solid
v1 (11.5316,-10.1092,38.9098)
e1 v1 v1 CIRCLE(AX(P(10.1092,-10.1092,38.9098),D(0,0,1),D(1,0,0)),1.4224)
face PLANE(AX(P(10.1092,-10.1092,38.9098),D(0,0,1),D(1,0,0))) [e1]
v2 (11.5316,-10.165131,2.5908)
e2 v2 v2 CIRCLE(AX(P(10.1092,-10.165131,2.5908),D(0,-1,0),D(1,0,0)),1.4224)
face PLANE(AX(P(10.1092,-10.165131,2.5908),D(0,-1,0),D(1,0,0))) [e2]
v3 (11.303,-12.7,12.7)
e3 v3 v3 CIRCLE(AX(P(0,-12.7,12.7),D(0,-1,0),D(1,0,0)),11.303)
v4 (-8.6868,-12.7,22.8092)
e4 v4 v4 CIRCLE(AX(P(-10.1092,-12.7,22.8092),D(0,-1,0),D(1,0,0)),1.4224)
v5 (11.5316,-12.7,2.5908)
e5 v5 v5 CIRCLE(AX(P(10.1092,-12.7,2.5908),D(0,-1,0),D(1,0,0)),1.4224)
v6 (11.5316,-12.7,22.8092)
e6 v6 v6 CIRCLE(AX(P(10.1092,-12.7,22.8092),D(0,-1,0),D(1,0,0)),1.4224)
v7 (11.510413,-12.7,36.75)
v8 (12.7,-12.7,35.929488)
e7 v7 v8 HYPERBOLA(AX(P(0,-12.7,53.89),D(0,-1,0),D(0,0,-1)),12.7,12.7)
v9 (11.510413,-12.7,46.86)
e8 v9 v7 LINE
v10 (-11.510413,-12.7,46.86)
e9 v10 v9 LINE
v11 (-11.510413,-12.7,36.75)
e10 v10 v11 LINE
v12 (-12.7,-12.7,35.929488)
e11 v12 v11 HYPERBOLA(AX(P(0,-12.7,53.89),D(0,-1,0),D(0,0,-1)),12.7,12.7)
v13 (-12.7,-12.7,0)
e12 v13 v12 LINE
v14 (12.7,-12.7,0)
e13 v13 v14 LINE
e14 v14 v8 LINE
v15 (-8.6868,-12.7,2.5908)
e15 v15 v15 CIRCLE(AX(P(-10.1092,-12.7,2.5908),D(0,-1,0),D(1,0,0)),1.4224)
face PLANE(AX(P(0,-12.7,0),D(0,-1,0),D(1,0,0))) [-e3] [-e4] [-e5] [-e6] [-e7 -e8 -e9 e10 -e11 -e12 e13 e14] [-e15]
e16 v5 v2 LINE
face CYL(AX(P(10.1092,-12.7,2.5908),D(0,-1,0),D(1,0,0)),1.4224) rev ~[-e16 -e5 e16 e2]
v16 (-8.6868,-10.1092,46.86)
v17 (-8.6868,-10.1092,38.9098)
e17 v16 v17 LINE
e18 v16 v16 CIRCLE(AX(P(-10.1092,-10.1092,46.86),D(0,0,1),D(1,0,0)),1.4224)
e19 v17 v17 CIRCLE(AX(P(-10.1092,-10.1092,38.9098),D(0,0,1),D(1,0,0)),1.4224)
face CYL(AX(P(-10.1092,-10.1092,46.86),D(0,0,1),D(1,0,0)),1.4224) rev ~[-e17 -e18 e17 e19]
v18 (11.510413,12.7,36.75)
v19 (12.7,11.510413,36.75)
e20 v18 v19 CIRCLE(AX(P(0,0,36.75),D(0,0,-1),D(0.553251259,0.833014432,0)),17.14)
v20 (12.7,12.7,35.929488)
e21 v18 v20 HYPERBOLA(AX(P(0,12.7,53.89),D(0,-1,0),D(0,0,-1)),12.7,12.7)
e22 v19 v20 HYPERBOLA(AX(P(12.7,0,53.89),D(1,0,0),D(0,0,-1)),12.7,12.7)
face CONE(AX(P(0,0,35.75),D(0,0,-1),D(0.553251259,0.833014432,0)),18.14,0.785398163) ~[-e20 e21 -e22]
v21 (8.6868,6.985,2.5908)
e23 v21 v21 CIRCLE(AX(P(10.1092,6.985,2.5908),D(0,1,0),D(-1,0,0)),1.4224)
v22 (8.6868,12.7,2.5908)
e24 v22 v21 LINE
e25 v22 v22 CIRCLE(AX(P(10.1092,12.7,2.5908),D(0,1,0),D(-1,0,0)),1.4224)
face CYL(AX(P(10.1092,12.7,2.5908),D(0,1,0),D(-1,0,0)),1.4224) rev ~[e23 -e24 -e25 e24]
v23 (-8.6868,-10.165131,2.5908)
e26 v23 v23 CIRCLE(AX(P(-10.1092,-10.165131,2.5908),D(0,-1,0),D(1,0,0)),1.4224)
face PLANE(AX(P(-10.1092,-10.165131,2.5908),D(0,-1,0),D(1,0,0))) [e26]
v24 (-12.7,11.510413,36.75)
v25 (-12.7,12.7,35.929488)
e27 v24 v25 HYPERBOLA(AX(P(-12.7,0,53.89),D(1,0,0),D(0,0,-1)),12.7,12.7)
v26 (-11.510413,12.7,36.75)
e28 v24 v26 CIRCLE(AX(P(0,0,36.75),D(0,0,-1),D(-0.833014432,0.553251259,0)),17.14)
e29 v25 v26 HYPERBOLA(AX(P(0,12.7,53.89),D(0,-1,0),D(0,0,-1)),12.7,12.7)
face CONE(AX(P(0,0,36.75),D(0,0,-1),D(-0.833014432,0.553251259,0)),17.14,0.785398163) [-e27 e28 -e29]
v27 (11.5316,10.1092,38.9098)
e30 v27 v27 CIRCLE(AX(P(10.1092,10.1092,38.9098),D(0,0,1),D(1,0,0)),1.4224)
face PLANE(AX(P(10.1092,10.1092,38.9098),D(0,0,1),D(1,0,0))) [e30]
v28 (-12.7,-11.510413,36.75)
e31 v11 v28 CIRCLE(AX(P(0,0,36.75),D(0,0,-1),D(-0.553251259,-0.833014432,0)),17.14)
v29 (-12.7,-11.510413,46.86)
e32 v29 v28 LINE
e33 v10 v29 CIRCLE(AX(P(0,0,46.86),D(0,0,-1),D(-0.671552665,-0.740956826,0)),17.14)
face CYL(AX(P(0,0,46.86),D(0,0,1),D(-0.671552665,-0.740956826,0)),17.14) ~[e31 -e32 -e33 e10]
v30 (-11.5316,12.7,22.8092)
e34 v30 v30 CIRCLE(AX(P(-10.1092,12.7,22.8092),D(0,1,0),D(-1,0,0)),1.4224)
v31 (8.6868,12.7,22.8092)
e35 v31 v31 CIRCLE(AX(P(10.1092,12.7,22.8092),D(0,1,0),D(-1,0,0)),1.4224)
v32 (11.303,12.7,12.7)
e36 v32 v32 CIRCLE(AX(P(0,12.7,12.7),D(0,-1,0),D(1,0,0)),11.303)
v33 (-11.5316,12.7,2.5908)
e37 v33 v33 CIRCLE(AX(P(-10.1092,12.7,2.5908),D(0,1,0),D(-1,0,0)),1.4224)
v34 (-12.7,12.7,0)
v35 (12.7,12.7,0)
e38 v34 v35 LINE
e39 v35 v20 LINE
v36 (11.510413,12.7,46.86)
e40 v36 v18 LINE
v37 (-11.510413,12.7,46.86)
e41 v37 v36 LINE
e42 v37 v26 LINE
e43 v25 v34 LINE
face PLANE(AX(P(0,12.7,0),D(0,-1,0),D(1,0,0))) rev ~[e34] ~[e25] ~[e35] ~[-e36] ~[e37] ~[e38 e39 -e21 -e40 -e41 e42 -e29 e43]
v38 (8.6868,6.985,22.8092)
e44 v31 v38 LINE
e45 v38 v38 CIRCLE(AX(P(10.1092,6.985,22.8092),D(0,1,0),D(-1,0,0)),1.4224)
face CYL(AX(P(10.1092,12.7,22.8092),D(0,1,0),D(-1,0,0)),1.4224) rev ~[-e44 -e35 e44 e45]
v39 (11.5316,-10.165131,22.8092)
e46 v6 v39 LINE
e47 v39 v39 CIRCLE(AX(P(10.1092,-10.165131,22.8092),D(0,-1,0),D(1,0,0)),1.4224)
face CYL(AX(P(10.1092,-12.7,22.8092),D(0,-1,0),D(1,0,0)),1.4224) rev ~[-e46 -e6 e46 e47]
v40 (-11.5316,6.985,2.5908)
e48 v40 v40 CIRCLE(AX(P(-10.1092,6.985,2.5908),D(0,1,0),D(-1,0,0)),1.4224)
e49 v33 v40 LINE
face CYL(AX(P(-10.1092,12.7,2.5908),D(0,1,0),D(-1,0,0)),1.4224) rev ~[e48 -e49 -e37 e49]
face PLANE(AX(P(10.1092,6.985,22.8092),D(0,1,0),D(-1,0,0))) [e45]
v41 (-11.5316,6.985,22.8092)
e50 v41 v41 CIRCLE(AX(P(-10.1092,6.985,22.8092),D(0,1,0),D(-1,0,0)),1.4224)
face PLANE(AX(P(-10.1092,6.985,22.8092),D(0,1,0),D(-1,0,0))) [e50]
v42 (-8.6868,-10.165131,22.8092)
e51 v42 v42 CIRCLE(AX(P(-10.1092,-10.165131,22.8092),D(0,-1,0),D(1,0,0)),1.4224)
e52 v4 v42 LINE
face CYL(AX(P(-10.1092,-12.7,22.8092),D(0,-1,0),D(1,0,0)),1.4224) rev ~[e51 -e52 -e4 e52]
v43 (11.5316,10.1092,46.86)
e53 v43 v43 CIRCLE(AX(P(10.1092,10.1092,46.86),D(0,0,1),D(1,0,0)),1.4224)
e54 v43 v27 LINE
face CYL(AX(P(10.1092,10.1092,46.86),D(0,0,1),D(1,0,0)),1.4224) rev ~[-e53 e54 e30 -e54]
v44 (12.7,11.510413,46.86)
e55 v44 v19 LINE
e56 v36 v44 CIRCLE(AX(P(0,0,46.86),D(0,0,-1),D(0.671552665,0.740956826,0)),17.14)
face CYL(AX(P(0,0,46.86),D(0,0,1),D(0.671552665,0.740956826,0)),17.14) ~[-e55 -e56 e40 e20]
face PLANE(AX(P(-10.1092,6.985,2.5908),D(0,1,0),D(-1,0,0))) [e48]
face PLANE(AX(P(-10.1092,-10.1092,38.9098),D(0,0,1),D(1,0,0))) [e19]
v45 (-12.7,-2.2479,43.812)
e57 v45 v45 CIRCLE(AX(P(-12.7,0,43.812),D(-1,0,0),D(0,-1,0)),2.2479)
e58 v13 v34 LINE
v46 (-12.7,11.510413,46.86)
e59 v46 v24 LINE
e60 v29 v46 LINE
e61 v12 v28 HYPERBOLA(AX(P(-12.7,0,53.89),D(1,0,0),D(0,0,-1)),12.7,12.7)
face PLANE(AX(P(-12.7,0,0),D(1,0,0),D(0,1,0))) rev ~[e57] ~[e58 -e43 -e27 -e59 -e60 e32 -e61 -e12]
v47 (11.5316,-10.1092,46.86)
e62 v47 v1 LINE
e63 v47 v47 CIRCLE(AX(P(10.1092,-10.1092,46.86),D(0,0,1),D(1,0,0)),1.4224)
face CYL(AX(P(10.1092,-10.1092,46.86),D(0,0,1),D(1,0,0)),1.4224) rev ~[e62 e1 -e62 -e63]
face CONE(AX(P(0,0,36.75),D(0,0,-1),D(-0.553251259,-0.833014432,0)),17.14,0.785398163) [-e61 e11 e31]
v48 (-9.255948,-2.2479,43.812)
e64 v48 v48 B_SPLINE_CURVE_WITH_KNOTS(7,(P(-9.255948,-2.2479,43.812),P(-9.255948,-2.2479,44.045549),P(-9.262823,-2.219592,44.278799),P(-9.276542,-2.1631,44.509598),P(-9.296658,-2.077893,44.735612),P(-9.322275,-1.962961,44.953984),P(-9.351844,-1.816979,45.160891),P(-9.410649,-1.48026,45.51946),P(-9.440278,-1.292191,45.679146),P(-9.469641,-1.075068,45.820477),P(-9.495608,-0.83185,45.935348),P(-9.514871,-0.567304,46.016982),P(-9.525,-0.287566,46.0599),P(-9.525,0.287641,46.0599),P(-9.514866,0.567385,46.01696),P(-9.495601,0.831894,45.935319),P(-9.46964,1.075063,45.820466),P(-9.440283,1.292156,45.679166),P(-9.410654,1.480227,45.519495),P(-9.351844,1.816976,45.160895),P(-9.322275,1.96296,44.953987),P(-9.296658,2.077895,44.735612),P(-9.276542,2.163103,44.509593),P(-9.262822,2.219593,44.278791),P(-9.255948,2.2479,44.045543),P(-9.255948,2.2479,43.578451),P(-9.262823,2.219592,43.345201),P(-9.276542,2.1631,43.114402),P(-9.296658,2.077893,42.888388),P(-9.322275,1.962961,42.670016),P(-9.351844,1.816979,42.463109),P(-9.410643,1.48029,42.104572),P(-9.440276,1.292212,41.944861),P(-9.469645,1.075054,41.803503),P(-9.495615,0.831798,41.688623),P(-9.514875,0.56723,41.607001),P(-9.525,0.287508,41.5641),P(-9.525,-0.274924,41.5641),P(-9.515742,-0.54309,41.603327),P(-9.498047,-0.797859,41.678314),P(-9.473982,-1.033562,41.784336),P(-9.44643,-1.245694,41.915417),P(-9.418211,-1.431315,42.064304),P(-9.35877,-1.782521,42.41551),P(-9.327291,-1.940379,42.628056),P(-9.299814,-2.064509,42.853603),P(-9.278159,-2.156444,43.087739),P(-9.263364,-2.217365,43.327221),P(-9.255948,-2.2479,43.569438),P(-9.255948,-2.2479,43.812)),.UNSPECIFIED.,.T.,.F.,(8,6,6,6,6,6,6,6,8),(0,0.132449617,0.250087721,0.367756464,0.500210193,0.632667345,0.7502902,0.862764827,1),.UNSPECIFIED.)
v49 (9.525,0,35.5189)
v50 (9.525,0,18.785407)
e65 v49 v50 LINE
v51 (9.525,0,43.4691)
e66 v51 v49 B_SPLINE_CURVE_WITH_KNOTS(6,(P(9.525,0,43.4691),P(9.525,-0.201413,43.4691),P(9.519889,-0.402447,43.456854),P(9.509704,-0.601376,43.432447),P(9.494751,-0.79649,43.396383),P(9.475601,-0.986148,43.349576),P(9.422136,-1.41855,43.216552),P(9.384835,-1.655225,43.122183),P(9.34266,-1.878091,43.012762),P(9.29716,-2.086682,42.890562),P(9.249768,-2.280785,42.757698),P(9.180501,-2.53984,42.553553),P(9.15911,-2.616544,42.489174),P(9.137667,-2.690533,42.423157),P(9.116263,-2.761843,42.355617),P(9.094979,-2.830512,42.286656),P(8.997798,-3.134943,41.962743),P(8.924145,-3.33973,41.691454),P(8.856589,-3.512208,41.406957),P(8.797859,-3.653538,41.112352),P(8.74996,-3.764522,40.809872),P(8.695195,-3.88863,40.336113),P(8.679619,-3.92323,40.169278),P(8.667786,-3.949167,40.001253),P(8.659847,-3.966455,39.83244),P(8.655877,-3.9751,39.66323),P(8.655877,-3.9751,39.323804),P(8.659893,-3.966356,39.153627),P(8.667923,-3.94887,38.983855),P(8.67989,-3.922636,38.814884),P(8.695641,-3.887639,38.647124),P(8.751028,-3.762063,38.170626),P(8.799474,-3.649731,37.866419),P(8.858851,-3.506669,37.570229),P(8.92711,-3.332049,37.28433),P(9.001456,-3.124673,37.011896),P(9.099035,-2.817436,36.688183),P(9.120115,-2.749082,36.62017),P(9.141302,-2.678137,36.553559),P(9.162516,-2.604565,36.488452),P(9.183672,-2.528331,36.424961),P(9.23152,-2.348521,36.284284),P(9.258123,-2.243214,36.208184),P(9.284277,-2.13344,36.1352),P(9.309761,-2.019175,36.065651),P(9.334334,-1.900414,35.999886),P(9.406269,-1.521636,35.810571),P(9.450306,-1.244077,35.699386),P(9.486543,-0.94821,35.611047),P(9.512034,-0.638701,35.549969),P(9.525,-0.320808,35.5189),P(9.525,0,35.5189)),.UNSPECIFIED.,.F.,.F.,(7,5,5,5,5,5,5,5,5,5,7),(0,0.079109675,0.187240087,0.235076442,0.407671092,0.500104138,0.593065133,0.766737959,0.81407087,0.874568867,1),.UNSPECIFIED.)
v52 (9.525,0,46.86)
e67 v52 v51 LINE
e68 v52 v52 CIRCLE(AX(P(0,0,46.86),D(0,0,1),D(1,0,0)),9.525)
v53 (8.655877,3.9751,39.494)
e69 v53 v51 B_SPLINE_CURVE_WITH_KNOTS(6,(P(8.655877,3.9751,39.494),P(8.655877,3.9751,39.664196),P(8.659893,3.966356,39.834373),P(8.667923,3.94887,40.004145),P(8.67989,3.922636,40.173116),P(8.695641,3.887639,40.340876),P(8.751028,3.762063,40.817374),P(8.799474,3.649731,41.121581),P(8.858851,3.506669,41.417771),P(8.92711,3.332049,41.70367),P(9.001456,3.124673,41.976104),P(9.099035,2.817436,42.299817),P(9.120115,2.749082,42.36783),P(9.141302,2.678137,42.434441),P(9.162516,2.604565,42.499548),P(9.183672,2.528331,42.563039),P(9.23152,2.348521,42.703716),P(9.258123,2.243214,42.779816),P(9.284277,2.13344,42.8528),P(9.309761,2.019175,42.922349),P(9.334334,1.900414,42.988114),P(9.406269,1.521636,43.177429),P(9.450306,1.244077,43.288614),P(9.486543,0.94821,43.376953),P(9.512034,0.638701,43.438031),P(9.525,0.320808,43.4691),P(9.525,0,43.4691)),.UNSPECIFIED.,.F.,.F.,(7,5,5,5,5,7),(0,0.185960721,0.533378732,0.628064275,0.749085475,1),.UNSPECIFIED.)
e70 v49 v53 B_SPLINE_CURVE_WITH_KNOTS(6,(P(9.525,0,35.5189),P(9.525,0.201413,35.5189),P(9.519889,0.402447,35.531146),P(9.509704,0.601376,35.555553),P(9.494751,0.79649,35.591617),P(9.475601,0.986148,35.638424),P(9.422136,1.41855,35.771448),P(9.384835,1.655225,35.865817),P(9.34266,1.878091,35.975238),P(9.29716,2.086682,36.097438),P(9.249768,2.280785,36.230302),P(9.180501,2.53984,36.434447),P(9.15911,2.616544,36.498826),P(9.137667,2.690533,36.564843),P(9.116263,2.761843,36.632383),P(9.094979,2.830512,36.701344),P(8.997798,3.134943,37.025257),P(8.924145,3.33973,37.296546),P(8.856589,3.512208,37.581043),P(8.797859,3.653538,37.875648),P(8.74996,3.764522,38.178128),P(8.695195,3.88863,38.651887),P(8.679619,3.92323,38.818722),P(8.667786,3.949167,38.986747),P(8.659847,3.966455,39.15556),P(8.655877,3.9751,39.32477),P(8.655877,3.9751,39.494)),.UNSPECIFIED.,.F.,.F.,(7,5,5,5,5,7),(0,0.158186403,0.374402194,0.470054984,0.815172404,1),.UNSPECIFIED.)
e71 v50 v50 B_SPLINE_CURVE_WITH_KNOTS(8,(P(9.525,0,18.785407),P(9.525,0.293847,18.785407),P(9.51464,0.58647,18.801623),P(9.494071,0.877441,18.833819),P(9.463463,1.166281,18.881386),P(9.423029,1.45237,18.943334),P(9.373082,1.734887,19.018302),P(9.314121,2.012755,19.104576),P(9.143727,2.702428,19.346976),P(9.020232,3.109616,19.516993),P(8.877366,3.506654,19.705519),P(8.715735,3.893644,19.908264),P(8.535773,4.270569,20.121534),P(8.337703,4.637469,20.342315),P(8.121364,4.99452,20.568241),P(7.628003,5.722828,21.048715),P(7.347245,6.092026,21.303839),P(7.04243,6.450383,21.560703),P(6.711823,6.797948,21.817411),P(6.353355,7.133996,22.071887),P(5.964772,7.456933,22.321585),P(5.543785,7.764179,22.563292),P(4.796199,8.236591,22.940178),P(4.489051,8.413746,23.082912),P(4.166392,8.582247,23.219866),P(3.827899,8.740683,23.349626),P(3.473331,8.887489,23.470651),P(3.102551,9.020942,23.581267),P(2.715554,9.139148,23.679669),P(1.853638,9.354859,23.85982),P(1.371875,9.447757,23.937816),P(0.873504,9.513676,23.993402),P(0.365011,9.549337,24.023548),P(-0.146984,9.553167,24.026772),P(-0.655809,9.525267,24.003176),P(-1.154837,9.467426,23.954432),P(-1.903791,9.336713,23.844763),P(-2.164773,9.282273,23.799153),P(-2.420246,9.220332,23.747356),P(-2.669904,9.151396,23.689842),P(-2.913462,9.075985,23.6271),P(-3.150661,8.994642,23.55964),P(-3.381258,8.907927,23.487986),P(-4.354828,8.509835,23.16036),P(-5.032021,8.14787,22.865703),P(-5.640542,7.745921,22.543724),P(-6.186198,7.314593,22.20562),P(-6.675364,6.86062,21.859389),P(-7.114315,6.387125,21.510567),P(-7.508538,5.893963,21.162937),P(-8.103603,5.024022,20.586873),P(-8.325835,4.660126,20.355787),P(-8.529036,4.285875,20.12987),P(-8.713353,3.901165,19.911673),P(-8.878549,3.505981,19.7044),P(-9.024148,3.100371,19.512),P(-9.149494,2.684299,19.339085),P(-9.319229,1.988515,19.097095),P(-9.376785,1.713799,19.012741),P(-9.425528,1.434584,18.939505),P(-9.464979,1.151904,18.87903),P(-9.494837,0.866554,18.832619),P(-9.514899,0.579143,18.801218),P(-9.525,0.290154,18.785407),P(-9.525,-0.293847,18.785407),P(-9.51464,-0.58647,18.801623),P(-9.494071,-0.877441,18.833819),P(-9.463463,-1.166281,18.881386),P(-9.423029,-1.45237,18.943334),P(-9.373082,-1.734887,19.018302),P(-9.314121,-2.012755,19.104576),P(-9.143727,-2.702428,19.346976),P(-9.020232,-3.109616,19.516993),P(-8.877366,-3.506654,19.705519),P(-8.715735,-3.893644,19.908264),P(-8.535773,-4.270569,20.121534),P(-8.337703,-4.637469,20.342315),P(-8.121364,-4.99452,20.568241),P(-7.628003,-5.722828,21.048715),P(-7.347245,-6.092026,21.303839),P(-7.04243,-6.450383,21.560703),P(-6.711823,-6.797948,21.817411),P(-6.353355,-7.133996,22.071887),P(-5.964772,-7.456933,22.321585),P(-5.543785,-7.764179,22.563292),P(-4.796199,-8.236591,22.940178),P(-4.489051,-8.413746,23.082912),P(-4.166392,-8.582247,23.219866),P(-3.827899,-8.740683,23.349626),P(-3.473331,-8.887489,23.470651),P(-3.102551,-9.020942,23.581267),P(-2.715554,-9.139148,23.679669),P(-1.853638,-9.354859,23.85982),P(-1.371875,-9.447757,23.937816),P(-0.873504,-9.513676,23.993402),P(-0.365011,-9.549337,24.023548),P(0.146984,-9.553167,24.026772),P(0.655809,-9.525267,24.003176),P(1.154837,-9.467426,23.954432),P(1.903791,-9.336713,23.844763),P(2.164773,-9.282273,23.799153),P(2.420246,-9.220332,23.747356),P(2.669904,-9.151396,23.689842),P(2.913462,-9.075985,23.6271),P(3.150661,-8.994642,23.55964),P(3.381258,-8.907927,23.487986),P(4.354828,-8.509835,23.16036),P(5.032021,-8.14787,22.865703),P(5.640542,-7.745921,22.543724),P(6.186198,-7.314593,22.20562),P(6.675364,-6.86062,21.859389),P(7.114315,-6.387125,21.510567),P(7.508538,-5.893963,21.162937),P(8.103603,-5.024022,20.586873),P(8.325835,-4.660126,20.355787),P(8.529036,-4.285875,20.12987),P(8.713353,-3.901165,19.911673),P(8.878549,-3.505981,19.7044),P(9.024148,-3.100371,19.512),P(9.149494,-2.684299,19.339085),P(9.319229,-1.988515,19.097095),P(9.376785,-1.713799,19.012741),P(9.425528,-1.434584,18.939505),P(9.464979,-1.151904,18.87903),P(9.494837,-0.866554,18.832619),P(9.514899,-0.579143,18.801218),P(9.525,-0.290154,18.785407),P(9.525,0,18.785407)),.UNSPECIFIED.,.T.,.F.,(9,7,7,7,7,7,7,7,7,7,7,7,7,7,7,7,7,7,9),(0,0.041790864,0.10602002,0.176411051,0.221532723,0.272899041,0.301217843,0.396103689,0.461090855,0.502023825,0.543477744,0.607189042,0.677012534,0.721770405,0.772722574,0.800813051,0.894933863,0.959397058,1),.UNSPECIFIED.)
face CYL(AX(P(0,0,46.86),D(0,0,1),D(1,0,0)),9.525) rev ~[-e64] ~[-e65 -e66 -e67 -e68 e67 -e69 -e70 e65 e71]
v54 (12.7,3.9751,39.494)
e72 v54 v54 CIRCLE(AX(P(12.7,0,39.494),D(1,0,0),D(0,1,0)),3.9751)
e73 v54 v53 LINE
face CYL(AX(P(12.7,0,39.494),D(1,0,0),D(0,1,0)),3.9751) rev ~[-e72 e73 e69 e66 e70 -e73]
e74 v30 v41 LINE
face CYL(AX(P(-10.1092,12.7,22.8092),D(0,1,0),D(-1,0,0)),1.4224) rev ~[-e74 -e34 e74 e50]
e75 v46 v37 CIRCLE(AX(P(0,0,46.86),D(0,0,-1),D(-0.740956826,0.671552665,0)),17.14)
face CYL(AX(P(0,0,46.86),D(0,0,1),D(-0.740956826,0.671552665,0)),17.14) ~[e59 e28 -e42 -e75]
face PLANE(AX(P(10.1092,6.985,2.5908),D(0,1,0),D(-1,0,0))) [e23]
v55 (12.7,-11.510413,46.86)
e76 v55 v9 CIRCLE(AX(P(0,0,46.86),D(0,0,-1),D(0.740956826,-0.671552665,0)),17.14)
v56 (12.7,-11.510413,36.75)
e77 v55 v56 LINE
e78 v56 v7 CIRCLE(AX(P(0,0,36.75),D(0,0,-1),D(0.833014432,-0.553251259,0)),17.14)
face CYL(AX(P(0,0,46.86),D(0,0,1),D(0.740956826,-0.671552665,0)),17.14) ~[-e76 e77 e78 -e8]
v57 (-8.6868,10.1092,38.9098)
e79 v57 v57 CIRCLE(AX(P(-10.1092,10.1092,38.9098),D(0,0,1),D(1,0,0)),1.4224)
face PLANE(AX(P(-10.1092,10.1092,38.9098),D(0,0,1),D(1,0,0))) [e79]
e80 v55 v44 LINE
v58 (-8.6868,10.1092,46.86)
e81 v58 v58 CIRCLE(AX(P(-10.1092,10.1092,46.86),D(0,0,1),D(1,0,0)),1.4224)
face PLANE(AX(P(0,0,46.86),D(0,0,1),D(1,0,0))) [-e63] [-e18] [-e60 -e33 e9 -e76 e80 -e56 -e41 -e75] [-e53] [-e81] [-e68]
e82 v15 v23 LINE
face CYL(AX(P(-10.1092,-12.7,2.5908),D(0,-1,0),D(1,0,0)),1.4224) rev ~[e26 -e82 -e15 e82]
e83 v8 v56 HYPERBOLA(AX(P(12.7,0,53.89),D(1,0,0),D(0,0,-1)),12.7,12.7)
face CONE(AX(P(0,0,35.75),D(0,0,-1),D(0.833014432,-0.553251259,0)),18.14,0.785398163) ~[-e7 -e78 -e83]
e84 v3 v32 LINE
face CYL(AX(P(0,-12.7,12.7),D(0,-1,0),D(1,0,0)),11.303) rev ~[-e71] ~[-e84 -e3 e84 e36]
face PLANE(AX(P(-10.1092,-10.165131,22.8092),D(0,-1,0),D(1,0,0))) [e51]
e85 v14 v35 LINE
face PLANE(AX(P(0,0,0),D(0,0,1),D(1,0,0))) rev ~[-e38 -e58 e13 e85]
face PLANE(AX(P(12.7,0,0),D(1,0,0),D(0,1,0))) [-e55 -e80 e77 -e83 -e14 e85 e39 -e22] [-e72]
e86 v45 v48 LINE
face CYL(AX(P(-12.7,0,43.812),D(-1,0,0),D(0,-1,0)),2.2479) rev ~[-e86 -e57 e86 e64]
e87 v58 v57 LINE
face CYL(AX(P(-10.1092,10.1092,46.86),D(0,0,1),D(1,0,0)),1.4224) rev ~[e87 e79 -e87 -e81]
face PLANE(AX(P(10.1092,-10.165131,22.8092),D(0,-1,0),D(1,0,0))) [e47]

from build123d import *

# Parameters (mm, degrees)
F0_W         = 25.4
F0_H         = 25.4
F1_DEPTH     = 46.86
F3_DEPTH     = 11.11
F4_T4_ANGLE  = 22.8192997927
F4_T10_ANGLE = 22.8192997927
F4_T16_ANGLE = 22.8192997927
F4_T22_ANGLE = 22.8192997927
F5_R         = 2.2479
F6_DEPTH     = 6.4371526241
F8_R         = 9.525
F9_DEPTH     = 31.75
F10_R        = 1.4224
F11_DEPTH    = 7.9502
F7_R         = 11.303
F12_DEPTH    = 25.401
F7_R_2       = 1.4224
F13_DEPTH    = 2.5348692
F14_R        = 3.9751
F15_DEPTH    = 6.35
F16_R        = 1.4224
F17_DEPTH    = 5.715


# Not quite as in the source:
# - a fillet or chamfer that OpenCascade refuses, or shapes differently, is made with other operations: its cross-section is extruded or revolved along the edge and cut away or added


with BuildPart() as f1:
    # F0 (on Top) → F1 (new body)
    with BuildSketch(Plane.XY):
        Rectangle(F0_W, F0_H)
    extrude(amount=F1_DEPTH)

    # F2 (on face) → F3 (cut)
    with BuildSketch(Plane.XY.offset(46.86)):
        with BuildLine():
            ThreePointArc((-11.5104126772, -12.7), (-12.1198102295, -12.1198102295), (-12.7, -11.5104126772))
            Line((-12.7, -11.5104126772), (-12.7, -12.7))
            Line((-12.7, -12.7), (-11.5104126772, -12.7))
        make_face()
        with BuildLine():
            ThreePointArc((-12.7, 11.5104126772), (-12.1198102295, 12.1198102295), (-11.5104126772, 12.7))
            Line((-11.5104126772, 12.7), (-12.7, 12.7))
            Line((-12.7, 12.7), (-12.7, 11.5104126772))
        make_face()
        with BuildLine():
            Line((12.7, 12.7), (11.5104126772, 12.7))
            ThreePointArc((11.5104126772, 12.7), (12.1198102295, 12.1198102295), (12.7, 11.5104126772))
            Line((12.7, 11.5104126772), (12.7, 12.7))
        make_face()
        with BuildLine():
            Line((12.7, -12.7), (12.7, -11.5104126772))
            ThreePointArc((12.7, -11.5104126772), (12.1198102295, -12.1198102295), (11.5104126772, -12.7))
            Line((11.5104126772, -12.7), (12.7, -12.7))
        make_face()
    extrude(amount=-F3_DEPTH, mode=Mode.SUBTRACT)

    # F4: chamfer of 1 on 4 edges, made by hand


with BuildPart() as f4_tool2:
    # F4_s3 → F4_t4 (revolve)
    with BuildSketch(Plane(origin=(0, 0, 0), x_dir=(0, 0, 1), z_dir=(0.8330144325, -0.5532512587, 0))):
        Polygon((36.75, 17.14), (35.75, 18.14), (35.75, 17.14), align=None)
    revolve(axis=Axis((0, 0, 35.75), (0, 0, -1)), revolution_arc=F4_T4_ANGLE)

    split(bisect_by=Plane.XZ.offset(12.7), keep=Keep.BOTTOM)

    split(bisect_by=Plane.YZ.offset(-12.7), keep=Keep.TOP)


with BuildPart() as f1_1:
    add(f1.part)

    # F4_t1: union F4_tool2
    add(f4_tool2.part)


with BuildPart() as f4_tool8:
    # F4_s9 → F4_t10 (revolve)
    with BuildSketch(Plane(origin=(0, 0, 0), x_dir=(0, 0, 1), z_dir=(0.5532512587, 0.8330144325, 0))):
        Polygon((35.75, 18.14), (36.75, 17.14), (35.75, 17.14), align=None)
    revolve(axis=Axis((0, 0, 35.75), (0, 0, -1)), revolution_arc=F4_T10_ANGLE)

    split(bisect_by=Plane.XZ.offset(12.7), keep=Keep.BOTTOM)

    split(bisect_by=Plane.YZ.offset(12.7), keep=Keep.BOTTOM)


with BuildPart() as f1_2:
    add(f1_1.part)

    # F4_t7: union F4_tool8
    add(f4_tool8.part)


with BuildPart() as f4_tool14:
    # F4_s15 → F4_t16 (revolve)
    with BuildSketch(Plane(origin=(0, 0, 0), x_dir=(0, 0, 1), z_dir=(-0.8330144325, 0.5532512587, 0))):
        Polygon((35.75, 18.14), (36.75, 17.14), (35.75, 17.14), align=None)
    revolve(axis=Axis((0, 0, 35.75), (0, 0, -1)), revolution_arc=F4_T16_ANGLE)

    split(bisect_by=Plane.YZ.offset(12.7), keep=Keep.BOTTOM)

    split(bisect_by=Plane.XZ.offset(-12.7), keep=Keep.TOP)


with BuildPart() as f1_3:
    add(f1_2.part)

    # F4_t13: union F4_tool14
    add(f4_tool14.part)


with BuildPart() as f4_tool20:
    # F4_s21 → F4_t22 (revolve)
    with BuildSketch(Plane(origin=(0, 0, 0), x_dir=(0, 0, 1), z_dir=(-0.5532512587, -0.8330144325, 0))):
        Polygon((36.75, 17.14), (35.75, 18.14), (35.75, 17.14), align=None)
    revolve(axis=Axis((0, 0, 35.75), (0, 0, -1)), revolution_arc=F4_T22_ANGLE)

    split(bisect_by=Plane.YZ.offset(-12.7), keep=Keep.TOP)

    split(bisect_by=Plane.XZ.offset(-12.7), keep=Keep.TOP)


with BuildPart() as f1_4:
    add(f1_3.part)

    # F4_t19: union F4_tool20
    add(f4_tool20.part)

    # F5 (on face) → F6 (cut)
    with BuildSketch(Plane(origin=(-12.7, 0, 0), x_dir=(0, -1, 0), z_dir=(-1, 0, 0))):
        with Locations((0, 43.812)):
            Circle(F5_R)
    extrude(amount=-F6_DEPTH, mode=Mode.SUBTRACT)

    # F8 (on face) → F9 (cut)
    with BuildSketch(Plane.XY.offset(46.86)):
        Circle(F8_R)
    extrude(amount=-F9_DEPTH, mode=Mode.SUBTRACT)

    # F10 (on face) → F11 (cut)
    with BuildSketch(Plane.XY.offset(46.86)):
        with Locations((10.1092, -10.1092)):
            Circle(F10_R)
        with Locations((10.1092, 10.1092)):
            Circle(F10_R)
        with Locations((-10.1092, 10.1092)):
            Circle(F10_R)
        with Locations((-10.1092, -10.1092)):
            Circle(F10_R)
    extrude(amount=-F11_DEPTH, mode=Mode.SUBTRACT)

    # F7 (on face) → F12 (cut, through all)
    with BuildSketch(Plane.XZ.offset(12.7)):
        with Locations((0, 12.7)):
            Circle(F7_R)
    extrude(amount=-F12_DEPTH, mode=Mode.SUBTRACT)

    # F7 (on face) → F13 (cut)
    with BuildSketch(Plane.XZ.offset(12.7)):
        with Locations((10.1092, 22.8092)):
            Circle(F7_R_2)
        with Locations((10.1092, 2.5908)):
            Circle(F7_R_2)
        with Locations((-10.1092, 2.5908)):
            Circle(F7_R_2)
        with Locations((-10.1092, 22.8092)):
            Circle(F7_R_2)
    extrude(amount=-F13_DEPTH, mode=Mode.SUBTRACT)

    # F14 (on face) → F15 (cut)
    with BuildSketch(Plane.YZ.offset(12.7)):
        with Locations((0, 39.494)):
            Circle(F14_R)
    extrude(amount=-F15_DEPTH, mode=Mode.SUBTRACT)

    # F16 (on face) → F17 (cut)
    with BuildSketch(Plane(origin=(0, 12.7, 0), x_dir=(-1, 0, 0), z_dir=(0, 1, 0))):
        with Locations((-10.1092, 22.8092)):
            Circle(F16_R)
        with Locations((10.1092, 22.8092)):
            Circle(F16_R)
        with Locations((10.1092, 2.5908)):
            Circle(F16_R)
        with Locations((-10.1092, 2.5908)):
            Circle(F16_R)
    extrude(amount=-F17_DEPTH, mode=Mode.SUBTRACT)


solid = f1_4.part
